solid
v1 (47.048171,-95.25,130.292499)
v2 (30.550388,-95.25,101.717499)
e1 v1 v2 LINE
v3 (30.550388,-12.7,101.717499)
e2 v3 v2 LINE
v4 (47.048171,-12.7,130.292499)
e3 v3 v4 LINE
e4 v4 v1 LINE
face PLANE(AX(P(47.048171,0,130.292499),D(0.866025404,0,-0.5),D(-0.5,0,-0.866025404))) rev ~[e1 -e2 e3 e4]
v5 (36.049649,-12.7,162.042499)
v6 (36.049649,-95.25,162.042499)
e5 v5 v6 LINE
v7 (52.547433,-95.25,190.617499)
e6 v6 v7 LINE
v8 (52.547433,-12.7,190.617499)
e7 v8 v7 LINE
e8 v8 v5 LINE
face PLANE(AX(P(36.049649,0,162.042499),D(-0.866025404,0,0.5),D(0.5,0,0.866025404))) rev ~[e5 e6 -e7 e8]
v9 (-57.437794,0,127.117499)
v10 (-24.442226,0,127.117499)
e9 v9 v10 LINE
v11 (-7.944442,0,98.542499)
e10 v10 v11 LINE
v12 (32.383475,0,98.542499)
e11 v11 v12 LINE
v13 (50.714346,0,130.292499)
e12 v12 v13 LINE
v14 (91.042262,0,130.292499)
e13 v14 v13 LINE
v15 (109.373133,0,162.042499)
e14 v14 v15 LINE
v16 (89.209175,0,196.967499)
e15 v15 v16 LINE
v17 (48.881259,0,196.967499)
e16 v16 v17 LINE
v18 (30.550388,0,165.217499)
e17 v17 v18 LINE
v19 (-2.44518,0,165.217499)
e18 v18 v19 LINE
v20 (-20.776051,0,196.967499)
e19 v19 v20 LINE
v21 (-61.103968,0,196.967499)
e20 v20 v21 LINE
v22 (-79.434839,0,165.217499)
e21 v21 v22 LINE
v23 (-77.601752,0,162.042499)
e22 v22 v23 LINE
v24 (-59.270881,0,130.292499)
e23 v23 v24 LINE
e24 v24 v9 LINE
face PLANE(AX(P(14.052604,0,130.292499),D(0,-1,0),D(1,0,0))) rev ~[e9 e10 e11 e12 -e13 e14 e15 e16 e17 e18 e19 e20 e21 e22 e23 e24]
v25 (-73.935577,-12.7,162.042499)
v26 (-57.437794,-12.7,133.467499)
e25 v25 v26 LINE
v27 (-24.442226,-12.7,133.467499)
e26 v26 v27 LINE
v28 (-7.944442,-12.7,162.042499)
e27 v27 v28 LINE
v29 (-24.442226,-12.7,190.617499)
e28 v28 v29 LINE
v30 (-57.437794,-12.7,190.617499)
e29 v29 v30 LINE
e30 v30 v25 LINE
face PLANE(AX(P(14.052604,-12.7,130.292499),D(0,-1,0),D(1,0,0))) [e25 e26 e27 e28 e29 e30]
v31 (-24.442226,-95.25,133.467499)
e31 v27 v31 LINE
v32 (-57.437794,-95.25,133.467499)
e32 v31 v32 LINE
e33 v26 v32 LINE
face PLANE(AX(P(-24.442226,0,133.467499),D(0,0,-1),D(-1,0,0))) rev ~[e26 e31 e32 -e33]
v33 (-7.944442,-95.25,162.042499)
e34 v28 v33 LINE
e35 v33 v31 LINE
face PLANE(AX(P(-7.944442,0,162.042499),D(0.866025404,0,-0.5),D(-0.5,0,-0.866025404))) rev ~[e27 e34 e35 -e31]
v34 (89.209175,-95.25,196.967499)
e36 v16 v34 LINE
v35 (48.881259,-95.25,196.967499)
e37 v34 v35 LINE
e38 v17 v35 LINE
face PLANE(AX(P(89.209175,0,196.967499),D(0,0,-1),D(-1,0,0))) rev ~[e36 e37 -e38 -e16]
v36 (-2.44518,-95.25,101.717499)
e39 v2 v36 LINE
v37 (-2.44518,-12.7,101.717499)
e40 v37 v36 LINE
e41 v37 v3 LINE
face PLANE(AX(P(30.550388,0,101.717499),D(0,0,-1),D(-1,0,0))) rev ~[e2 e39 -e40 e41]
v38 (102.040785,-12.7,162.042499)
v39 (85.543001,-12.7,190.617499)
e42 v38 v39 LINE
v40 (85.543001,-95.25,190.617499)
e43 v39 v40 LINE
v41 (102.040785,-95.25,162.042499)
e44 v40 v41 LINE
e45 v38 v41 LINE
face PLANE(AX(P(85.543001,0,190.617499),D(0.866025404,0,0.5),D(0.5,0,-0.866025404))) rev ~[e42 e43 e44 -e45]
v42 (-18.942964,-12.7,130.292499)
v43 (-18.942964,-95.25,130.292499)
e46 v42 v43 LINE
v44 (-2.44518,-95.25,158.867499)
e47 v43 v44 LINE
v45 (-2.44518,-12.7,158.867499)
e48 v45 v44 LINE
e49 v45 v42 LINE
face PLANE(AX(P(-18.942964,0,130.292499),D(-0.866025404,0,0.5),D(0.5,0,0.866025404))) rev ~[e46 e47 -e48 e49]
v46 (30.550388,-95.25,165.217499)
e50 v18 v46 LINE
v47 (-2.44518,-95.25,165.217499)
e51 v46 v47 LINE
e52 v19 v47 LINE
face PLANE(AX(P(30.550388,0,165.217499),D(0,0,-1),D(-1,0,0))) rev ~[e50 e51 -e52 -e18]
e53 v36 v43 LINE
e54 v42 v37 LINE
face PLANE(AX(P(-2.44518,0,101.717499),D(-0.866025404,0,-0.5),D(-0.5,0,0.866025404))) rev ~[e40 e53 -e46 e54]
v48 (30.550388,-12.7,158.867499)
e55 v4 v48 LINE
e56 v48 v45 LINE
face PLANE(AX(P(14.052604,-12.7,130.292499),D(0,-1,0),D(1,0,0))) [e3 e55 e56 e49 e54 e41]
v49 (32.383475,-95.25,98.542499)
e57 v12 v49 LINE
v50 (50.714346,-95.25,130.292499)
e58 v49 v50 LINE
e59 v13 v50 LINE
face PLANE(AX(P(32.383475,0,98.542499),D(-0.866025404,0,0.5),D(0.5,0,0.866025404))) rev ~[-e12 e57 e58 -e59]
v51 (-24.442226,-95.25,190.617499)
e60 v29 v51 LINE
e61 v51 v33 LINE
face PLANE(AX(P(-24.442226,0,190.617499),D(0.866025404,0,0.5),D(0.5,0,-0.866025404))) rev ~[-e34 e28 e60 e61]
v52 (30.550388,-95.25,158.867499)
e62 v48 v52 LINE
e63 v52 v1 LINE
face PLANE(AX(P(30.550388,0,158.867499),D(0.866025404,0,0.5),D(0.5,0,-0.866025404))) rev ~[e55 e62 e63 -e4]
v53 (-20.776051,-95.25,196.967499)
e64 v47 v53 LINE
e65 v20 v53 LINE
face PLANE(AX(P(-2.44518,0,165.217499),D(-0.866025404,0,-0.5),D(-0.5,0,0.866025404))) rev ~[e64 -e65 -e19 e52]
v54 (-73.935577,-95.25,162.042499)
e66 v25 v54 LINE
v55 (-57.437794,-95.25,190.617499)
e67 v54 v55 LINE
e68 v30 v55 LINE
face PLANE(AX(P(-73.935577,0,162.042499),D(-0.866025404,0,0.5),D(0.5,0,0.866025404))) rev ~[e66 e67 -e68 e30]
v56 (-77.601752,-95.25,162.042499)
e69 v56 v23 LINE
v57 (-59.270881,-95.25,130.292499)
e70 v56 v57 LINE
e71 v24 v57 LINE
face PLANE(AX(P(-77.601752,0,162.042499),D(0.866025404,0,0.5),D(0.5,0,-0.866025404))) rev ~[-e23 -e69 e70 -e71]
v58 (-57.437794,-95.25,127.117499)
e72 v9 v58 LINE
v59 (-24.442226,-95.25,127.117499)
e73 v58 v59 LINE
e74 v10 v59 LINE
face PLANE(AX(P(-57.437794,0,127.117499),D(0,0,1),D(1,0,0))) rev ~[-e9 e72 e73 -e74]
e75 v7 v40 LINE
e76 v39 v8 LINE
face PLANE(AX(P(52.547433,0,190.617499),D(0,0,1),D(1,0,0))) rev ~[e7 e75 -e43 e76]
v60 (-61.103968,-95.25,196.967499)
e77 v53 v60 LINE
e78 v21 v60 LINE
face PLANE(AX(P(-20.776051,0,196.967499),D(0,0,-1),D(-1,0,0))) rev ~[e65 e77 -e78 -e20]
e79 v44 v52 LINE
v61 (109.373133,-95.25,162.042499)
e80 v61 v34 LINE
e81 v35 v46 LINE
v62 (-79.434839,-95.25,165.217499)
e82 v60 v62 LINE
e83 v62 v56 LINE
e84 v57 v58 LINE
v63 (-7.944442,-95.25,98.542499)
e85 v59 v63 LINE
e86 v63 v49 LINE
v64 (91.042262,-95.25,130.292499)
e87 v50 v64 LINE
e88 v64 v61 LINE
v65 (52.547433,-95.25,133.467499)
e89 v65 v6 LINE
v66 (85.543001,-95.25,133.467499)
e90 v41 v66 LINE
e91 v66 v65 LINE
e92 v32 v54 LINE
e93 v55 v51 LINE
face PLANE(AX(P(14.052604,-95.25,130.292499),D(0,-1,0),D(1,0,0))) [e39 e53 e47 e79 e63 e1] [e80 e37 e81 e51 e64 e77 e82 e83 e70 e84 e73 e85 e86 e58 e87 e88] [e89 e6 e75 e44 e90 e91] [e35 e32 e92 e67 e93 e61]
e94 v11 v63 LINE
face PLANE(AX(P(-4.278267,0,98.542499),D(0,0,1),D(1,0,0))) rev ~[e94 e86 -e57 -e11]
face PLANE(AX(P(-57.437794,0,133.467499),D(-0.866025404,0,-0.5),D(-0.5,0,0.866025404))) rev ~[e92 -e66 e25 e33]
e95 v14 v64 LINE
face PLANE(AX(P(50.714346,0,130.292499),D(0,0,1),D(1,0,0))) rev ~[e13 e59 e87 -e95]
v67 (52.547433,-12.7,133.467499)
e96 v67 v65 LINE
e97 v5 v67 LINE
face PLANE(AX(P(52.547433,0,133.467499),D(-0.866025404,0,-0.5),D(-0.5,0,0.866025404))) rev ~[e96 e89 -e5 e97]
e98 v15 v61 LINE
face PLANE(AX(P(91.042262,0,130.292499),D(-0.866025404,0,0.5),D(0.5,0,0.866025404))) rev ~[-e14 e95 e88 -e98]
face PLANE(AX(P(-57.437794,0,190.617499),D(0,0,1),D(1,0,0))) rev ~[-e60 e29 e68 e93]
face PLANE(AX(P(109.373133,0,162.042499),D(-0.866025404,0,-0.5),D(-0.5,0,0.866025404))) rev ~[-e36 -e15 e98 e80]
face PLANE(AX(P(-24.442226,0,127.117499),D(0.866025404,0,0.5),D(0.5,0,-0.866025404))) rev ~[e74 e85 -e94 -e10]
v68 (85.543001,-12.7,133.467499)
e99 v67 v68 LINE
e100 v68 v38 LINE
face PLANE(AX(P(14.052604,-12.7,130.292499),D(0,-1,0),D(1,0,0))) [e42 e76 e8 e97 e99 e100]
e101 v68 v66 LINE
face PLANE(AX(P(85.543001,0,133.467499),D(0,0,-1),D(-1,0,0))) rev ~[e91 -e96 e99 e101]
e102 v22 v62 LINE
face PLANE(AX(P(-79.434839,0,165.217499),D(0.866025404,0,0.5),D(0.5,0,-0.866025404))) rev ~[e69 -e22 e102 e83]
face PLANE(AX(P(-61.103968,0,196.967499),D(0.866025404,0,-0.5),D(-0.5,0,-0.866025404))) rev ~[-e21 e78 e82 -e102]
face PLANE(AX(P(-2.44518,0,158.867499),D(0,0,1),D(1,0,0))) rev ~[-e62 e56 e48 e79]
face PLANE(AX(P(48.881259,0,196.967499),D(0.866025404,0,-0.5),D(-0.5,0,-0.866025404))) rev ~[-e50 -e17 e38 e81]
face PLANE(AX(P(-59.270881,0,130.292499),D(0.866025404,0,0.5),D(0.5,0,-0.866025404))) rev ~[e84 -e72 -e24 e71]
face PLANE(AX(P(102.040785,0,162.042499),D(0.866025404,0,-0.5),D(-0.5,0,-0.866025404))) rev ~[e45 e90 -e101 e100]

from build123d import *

# Parameters (mm, degrees)
F1_DEPTH = 12.7
F2_DEPTH = 95.25


# Not quite as in the source:
# - a feature names something its author has since deleted; it is built from what else it names


with BuildPart() as f1:
    # F0 (on Front) → F1 (new body)
    with BuildSketch(Plane.XZ):
        Polygon((-22.6091385288, 130.2924993012), (-4.278267482, 98.5424993012), (32.3834746115, 98.5424993012), (50.7143456583, 130.2924993012), (32.3834746116, 162.0424993012), (-4.278267482, 162.0424993012), align=None)
        Polygon((-2.4451803773, 101.7174993012), (-18.9429643194, 130.2924993012), (-2.4451803773, 158.8674993012), (30.5503875069, 158.8674993012), (47.048171449, 130.2924993012), (30.5503875069, 101.7174993012), align=None, mode=Mode.SUBTRACT)
        Polygon((-27.4963065598, 130.2924993012), (-22.6091385288, 130.2924993012), (-4.278267482, 162.0424993012), (-22.6091385288, 193.7924993012), (-59.2708806223, 193.7924993012), (-77.6017516691, 162.0424993012), (-59.2708806223, 130.2924993012), align=None)
        Polygon((-57.4377935176, 133.4674993012), (-73.9355774597, 162.0424993012), (-57.4377935176, 190.6174993012), (-24.4422256334, 190.6174993012), (-7.9444416913, 162.0424993012), (-24.4422256334, 133.4674993012), align=None, mode=Mode.SUBTRACT)
        Polygon((32.3834746116, 162.0424993012), (50.7143456583, 130.2924993012), (87.3760877519, 130.2924993012), (105.7069587986, 162.0424993012), (87.3760877519, 193.7924993012), (50.7143456583, 193.7924993012), align=None)
        Polygon((52.547432763, 133.4674993012), (36.0496488209, 162.0424993012), (52.547432763, 190.6174993012), (85.5430006472, 190.6174993012), (102.0407845893, 162.0424993012), (85.5430006472, 133.4674993012), align=None, mode=Mode.SUBTRACT)
        Polygon((-57.4377935176, 190.6174993012), (-73.9355774597, 162.0424993012), (-57.4377935176, 133.4674993012), (-24.4422256334, 133.4674993012), (-7.9444416913, 162.0424993012), (-24.4422256334, 190.6174993012), align=None)
        Polygon((52.547432763, 190.6174993012), (36.0496488209, 162.0424993012), (52.547432763, 133.4674993012), (85.5430006472, 133.4674993012), (102.0407845893, 162.0424993012), (85.5430006472, 190.6174993012), align=None)
        Polygon((-2.4451803773, 158.8674993012), (-18.9429643194, 130.2924993012), (-2.4451803773, 101.7174993012), (30.5503875069, 101.7174993012), (47.048171449, 130.2924993012), (30.5503875069, 158.8674993012), align=None)
    extrude(amount=F1_DEPTH)

    # F0 (on Front) → F2 (join)
    with BuildSketch(Plane.XZ):
        Polygon((-22.6091385288, 130.2924993012), (-4.278267482, 98.5424993012), (32.3834746115, 98.5424993012), (50.7143456583, 130.2924993012), (32.3834746116, 162.0424993012), (-4.278267482, 162.0424993012), align=None)
        Polygon((-2.4451803773, 101.7174993012), (-18.9429643194, 130.2924993012), (-2.4451803773, 158.8674993012), (30.5503875069, 158.8674993012), (47.048171449, 130.2924993012), (30.5503875069, 101.7174993012), align=None, mode=Mode.SUBTRACT)
        Polygon((32.3834746116, 162.0424993012), (50.7143456583, 130.2924993012), (87.3760877519, 130.2924993012), (105.7069587986, 162.0424993012), (87.3760877519, 193.7924993012), (50.7143456583, 193.7924993012), align=None)
        Polygon((52.547432763, 133.4674993012), (36.0496488209, 162.0424993012), (52.547432763, 190.6174993012), (85.5430006472, 190.6174993012), (102.0407845893, 162.0424993012), (85.5430006472, 133.4674993012), align=None, mode=Mode.SUBTRACT)
        Polygon((-27.4963065598, 130.2924993012), (-22.6091385288, 130.2924993012), (-4.278267482, 162.0424993012), (-22.6091385288, 193.7924993012), (-59.2708806223, 193.7924993012), (-77.6017516691, 162.0424993012), (-59.2708806223, 130.2924993012), align=None)
        Polygon((-57.4377935176, 133.4674993012), (-73.9355774597, 162.0424993012), (-57.4377935176, 190.6174993012), (-24.4422256334, 190.6174993012), (-7.9444416913, 162.0424993012), (-24.4422256334, 133.4674993012), align=None, mode=Mode.SUBTRACT)
        Polygon((-22.6091385288, 193.7924993012), (-4.278267482, 162.0424993012), (32.3834746116, 162.0424993012), (50.7143456583, 193.7924993012), (87.3760877519, 193.7924993012), (105.7069587986, 162.0424993012), (87.3760877519, 130.2924993012), (91.0422619612, 130.2924993012), (109.373133008, 162.0424993012), (89.2091748565, 196.9674993012), (48.8812585537, 196.9674993012), (30.5503875069, 165.2174993012), (-2.4451803773, 165.2174993012), (-20.7760514241, 196.9674993012), (-61.103967727, 196.9674993012), (-79.4348387737, 165.2174993012), (-77.6017516691, 162.0424993012), (-59.2708806223, 193.7924993012), align=None)
        Polygon((-7.9444416913, 98.5424993012), (-4.278267482, 98.5424993012), (-22.6091385288, 130.2924993012), (-27.4963065598, 130.2924993012), (-59.2708806223, 130.2924993012), (-57.4377935176, 127.1174993012), (-24.4422256334, 127.1174993012), align=None)
    extrude(amount=F2_DEPTH)


solid = f1.part
